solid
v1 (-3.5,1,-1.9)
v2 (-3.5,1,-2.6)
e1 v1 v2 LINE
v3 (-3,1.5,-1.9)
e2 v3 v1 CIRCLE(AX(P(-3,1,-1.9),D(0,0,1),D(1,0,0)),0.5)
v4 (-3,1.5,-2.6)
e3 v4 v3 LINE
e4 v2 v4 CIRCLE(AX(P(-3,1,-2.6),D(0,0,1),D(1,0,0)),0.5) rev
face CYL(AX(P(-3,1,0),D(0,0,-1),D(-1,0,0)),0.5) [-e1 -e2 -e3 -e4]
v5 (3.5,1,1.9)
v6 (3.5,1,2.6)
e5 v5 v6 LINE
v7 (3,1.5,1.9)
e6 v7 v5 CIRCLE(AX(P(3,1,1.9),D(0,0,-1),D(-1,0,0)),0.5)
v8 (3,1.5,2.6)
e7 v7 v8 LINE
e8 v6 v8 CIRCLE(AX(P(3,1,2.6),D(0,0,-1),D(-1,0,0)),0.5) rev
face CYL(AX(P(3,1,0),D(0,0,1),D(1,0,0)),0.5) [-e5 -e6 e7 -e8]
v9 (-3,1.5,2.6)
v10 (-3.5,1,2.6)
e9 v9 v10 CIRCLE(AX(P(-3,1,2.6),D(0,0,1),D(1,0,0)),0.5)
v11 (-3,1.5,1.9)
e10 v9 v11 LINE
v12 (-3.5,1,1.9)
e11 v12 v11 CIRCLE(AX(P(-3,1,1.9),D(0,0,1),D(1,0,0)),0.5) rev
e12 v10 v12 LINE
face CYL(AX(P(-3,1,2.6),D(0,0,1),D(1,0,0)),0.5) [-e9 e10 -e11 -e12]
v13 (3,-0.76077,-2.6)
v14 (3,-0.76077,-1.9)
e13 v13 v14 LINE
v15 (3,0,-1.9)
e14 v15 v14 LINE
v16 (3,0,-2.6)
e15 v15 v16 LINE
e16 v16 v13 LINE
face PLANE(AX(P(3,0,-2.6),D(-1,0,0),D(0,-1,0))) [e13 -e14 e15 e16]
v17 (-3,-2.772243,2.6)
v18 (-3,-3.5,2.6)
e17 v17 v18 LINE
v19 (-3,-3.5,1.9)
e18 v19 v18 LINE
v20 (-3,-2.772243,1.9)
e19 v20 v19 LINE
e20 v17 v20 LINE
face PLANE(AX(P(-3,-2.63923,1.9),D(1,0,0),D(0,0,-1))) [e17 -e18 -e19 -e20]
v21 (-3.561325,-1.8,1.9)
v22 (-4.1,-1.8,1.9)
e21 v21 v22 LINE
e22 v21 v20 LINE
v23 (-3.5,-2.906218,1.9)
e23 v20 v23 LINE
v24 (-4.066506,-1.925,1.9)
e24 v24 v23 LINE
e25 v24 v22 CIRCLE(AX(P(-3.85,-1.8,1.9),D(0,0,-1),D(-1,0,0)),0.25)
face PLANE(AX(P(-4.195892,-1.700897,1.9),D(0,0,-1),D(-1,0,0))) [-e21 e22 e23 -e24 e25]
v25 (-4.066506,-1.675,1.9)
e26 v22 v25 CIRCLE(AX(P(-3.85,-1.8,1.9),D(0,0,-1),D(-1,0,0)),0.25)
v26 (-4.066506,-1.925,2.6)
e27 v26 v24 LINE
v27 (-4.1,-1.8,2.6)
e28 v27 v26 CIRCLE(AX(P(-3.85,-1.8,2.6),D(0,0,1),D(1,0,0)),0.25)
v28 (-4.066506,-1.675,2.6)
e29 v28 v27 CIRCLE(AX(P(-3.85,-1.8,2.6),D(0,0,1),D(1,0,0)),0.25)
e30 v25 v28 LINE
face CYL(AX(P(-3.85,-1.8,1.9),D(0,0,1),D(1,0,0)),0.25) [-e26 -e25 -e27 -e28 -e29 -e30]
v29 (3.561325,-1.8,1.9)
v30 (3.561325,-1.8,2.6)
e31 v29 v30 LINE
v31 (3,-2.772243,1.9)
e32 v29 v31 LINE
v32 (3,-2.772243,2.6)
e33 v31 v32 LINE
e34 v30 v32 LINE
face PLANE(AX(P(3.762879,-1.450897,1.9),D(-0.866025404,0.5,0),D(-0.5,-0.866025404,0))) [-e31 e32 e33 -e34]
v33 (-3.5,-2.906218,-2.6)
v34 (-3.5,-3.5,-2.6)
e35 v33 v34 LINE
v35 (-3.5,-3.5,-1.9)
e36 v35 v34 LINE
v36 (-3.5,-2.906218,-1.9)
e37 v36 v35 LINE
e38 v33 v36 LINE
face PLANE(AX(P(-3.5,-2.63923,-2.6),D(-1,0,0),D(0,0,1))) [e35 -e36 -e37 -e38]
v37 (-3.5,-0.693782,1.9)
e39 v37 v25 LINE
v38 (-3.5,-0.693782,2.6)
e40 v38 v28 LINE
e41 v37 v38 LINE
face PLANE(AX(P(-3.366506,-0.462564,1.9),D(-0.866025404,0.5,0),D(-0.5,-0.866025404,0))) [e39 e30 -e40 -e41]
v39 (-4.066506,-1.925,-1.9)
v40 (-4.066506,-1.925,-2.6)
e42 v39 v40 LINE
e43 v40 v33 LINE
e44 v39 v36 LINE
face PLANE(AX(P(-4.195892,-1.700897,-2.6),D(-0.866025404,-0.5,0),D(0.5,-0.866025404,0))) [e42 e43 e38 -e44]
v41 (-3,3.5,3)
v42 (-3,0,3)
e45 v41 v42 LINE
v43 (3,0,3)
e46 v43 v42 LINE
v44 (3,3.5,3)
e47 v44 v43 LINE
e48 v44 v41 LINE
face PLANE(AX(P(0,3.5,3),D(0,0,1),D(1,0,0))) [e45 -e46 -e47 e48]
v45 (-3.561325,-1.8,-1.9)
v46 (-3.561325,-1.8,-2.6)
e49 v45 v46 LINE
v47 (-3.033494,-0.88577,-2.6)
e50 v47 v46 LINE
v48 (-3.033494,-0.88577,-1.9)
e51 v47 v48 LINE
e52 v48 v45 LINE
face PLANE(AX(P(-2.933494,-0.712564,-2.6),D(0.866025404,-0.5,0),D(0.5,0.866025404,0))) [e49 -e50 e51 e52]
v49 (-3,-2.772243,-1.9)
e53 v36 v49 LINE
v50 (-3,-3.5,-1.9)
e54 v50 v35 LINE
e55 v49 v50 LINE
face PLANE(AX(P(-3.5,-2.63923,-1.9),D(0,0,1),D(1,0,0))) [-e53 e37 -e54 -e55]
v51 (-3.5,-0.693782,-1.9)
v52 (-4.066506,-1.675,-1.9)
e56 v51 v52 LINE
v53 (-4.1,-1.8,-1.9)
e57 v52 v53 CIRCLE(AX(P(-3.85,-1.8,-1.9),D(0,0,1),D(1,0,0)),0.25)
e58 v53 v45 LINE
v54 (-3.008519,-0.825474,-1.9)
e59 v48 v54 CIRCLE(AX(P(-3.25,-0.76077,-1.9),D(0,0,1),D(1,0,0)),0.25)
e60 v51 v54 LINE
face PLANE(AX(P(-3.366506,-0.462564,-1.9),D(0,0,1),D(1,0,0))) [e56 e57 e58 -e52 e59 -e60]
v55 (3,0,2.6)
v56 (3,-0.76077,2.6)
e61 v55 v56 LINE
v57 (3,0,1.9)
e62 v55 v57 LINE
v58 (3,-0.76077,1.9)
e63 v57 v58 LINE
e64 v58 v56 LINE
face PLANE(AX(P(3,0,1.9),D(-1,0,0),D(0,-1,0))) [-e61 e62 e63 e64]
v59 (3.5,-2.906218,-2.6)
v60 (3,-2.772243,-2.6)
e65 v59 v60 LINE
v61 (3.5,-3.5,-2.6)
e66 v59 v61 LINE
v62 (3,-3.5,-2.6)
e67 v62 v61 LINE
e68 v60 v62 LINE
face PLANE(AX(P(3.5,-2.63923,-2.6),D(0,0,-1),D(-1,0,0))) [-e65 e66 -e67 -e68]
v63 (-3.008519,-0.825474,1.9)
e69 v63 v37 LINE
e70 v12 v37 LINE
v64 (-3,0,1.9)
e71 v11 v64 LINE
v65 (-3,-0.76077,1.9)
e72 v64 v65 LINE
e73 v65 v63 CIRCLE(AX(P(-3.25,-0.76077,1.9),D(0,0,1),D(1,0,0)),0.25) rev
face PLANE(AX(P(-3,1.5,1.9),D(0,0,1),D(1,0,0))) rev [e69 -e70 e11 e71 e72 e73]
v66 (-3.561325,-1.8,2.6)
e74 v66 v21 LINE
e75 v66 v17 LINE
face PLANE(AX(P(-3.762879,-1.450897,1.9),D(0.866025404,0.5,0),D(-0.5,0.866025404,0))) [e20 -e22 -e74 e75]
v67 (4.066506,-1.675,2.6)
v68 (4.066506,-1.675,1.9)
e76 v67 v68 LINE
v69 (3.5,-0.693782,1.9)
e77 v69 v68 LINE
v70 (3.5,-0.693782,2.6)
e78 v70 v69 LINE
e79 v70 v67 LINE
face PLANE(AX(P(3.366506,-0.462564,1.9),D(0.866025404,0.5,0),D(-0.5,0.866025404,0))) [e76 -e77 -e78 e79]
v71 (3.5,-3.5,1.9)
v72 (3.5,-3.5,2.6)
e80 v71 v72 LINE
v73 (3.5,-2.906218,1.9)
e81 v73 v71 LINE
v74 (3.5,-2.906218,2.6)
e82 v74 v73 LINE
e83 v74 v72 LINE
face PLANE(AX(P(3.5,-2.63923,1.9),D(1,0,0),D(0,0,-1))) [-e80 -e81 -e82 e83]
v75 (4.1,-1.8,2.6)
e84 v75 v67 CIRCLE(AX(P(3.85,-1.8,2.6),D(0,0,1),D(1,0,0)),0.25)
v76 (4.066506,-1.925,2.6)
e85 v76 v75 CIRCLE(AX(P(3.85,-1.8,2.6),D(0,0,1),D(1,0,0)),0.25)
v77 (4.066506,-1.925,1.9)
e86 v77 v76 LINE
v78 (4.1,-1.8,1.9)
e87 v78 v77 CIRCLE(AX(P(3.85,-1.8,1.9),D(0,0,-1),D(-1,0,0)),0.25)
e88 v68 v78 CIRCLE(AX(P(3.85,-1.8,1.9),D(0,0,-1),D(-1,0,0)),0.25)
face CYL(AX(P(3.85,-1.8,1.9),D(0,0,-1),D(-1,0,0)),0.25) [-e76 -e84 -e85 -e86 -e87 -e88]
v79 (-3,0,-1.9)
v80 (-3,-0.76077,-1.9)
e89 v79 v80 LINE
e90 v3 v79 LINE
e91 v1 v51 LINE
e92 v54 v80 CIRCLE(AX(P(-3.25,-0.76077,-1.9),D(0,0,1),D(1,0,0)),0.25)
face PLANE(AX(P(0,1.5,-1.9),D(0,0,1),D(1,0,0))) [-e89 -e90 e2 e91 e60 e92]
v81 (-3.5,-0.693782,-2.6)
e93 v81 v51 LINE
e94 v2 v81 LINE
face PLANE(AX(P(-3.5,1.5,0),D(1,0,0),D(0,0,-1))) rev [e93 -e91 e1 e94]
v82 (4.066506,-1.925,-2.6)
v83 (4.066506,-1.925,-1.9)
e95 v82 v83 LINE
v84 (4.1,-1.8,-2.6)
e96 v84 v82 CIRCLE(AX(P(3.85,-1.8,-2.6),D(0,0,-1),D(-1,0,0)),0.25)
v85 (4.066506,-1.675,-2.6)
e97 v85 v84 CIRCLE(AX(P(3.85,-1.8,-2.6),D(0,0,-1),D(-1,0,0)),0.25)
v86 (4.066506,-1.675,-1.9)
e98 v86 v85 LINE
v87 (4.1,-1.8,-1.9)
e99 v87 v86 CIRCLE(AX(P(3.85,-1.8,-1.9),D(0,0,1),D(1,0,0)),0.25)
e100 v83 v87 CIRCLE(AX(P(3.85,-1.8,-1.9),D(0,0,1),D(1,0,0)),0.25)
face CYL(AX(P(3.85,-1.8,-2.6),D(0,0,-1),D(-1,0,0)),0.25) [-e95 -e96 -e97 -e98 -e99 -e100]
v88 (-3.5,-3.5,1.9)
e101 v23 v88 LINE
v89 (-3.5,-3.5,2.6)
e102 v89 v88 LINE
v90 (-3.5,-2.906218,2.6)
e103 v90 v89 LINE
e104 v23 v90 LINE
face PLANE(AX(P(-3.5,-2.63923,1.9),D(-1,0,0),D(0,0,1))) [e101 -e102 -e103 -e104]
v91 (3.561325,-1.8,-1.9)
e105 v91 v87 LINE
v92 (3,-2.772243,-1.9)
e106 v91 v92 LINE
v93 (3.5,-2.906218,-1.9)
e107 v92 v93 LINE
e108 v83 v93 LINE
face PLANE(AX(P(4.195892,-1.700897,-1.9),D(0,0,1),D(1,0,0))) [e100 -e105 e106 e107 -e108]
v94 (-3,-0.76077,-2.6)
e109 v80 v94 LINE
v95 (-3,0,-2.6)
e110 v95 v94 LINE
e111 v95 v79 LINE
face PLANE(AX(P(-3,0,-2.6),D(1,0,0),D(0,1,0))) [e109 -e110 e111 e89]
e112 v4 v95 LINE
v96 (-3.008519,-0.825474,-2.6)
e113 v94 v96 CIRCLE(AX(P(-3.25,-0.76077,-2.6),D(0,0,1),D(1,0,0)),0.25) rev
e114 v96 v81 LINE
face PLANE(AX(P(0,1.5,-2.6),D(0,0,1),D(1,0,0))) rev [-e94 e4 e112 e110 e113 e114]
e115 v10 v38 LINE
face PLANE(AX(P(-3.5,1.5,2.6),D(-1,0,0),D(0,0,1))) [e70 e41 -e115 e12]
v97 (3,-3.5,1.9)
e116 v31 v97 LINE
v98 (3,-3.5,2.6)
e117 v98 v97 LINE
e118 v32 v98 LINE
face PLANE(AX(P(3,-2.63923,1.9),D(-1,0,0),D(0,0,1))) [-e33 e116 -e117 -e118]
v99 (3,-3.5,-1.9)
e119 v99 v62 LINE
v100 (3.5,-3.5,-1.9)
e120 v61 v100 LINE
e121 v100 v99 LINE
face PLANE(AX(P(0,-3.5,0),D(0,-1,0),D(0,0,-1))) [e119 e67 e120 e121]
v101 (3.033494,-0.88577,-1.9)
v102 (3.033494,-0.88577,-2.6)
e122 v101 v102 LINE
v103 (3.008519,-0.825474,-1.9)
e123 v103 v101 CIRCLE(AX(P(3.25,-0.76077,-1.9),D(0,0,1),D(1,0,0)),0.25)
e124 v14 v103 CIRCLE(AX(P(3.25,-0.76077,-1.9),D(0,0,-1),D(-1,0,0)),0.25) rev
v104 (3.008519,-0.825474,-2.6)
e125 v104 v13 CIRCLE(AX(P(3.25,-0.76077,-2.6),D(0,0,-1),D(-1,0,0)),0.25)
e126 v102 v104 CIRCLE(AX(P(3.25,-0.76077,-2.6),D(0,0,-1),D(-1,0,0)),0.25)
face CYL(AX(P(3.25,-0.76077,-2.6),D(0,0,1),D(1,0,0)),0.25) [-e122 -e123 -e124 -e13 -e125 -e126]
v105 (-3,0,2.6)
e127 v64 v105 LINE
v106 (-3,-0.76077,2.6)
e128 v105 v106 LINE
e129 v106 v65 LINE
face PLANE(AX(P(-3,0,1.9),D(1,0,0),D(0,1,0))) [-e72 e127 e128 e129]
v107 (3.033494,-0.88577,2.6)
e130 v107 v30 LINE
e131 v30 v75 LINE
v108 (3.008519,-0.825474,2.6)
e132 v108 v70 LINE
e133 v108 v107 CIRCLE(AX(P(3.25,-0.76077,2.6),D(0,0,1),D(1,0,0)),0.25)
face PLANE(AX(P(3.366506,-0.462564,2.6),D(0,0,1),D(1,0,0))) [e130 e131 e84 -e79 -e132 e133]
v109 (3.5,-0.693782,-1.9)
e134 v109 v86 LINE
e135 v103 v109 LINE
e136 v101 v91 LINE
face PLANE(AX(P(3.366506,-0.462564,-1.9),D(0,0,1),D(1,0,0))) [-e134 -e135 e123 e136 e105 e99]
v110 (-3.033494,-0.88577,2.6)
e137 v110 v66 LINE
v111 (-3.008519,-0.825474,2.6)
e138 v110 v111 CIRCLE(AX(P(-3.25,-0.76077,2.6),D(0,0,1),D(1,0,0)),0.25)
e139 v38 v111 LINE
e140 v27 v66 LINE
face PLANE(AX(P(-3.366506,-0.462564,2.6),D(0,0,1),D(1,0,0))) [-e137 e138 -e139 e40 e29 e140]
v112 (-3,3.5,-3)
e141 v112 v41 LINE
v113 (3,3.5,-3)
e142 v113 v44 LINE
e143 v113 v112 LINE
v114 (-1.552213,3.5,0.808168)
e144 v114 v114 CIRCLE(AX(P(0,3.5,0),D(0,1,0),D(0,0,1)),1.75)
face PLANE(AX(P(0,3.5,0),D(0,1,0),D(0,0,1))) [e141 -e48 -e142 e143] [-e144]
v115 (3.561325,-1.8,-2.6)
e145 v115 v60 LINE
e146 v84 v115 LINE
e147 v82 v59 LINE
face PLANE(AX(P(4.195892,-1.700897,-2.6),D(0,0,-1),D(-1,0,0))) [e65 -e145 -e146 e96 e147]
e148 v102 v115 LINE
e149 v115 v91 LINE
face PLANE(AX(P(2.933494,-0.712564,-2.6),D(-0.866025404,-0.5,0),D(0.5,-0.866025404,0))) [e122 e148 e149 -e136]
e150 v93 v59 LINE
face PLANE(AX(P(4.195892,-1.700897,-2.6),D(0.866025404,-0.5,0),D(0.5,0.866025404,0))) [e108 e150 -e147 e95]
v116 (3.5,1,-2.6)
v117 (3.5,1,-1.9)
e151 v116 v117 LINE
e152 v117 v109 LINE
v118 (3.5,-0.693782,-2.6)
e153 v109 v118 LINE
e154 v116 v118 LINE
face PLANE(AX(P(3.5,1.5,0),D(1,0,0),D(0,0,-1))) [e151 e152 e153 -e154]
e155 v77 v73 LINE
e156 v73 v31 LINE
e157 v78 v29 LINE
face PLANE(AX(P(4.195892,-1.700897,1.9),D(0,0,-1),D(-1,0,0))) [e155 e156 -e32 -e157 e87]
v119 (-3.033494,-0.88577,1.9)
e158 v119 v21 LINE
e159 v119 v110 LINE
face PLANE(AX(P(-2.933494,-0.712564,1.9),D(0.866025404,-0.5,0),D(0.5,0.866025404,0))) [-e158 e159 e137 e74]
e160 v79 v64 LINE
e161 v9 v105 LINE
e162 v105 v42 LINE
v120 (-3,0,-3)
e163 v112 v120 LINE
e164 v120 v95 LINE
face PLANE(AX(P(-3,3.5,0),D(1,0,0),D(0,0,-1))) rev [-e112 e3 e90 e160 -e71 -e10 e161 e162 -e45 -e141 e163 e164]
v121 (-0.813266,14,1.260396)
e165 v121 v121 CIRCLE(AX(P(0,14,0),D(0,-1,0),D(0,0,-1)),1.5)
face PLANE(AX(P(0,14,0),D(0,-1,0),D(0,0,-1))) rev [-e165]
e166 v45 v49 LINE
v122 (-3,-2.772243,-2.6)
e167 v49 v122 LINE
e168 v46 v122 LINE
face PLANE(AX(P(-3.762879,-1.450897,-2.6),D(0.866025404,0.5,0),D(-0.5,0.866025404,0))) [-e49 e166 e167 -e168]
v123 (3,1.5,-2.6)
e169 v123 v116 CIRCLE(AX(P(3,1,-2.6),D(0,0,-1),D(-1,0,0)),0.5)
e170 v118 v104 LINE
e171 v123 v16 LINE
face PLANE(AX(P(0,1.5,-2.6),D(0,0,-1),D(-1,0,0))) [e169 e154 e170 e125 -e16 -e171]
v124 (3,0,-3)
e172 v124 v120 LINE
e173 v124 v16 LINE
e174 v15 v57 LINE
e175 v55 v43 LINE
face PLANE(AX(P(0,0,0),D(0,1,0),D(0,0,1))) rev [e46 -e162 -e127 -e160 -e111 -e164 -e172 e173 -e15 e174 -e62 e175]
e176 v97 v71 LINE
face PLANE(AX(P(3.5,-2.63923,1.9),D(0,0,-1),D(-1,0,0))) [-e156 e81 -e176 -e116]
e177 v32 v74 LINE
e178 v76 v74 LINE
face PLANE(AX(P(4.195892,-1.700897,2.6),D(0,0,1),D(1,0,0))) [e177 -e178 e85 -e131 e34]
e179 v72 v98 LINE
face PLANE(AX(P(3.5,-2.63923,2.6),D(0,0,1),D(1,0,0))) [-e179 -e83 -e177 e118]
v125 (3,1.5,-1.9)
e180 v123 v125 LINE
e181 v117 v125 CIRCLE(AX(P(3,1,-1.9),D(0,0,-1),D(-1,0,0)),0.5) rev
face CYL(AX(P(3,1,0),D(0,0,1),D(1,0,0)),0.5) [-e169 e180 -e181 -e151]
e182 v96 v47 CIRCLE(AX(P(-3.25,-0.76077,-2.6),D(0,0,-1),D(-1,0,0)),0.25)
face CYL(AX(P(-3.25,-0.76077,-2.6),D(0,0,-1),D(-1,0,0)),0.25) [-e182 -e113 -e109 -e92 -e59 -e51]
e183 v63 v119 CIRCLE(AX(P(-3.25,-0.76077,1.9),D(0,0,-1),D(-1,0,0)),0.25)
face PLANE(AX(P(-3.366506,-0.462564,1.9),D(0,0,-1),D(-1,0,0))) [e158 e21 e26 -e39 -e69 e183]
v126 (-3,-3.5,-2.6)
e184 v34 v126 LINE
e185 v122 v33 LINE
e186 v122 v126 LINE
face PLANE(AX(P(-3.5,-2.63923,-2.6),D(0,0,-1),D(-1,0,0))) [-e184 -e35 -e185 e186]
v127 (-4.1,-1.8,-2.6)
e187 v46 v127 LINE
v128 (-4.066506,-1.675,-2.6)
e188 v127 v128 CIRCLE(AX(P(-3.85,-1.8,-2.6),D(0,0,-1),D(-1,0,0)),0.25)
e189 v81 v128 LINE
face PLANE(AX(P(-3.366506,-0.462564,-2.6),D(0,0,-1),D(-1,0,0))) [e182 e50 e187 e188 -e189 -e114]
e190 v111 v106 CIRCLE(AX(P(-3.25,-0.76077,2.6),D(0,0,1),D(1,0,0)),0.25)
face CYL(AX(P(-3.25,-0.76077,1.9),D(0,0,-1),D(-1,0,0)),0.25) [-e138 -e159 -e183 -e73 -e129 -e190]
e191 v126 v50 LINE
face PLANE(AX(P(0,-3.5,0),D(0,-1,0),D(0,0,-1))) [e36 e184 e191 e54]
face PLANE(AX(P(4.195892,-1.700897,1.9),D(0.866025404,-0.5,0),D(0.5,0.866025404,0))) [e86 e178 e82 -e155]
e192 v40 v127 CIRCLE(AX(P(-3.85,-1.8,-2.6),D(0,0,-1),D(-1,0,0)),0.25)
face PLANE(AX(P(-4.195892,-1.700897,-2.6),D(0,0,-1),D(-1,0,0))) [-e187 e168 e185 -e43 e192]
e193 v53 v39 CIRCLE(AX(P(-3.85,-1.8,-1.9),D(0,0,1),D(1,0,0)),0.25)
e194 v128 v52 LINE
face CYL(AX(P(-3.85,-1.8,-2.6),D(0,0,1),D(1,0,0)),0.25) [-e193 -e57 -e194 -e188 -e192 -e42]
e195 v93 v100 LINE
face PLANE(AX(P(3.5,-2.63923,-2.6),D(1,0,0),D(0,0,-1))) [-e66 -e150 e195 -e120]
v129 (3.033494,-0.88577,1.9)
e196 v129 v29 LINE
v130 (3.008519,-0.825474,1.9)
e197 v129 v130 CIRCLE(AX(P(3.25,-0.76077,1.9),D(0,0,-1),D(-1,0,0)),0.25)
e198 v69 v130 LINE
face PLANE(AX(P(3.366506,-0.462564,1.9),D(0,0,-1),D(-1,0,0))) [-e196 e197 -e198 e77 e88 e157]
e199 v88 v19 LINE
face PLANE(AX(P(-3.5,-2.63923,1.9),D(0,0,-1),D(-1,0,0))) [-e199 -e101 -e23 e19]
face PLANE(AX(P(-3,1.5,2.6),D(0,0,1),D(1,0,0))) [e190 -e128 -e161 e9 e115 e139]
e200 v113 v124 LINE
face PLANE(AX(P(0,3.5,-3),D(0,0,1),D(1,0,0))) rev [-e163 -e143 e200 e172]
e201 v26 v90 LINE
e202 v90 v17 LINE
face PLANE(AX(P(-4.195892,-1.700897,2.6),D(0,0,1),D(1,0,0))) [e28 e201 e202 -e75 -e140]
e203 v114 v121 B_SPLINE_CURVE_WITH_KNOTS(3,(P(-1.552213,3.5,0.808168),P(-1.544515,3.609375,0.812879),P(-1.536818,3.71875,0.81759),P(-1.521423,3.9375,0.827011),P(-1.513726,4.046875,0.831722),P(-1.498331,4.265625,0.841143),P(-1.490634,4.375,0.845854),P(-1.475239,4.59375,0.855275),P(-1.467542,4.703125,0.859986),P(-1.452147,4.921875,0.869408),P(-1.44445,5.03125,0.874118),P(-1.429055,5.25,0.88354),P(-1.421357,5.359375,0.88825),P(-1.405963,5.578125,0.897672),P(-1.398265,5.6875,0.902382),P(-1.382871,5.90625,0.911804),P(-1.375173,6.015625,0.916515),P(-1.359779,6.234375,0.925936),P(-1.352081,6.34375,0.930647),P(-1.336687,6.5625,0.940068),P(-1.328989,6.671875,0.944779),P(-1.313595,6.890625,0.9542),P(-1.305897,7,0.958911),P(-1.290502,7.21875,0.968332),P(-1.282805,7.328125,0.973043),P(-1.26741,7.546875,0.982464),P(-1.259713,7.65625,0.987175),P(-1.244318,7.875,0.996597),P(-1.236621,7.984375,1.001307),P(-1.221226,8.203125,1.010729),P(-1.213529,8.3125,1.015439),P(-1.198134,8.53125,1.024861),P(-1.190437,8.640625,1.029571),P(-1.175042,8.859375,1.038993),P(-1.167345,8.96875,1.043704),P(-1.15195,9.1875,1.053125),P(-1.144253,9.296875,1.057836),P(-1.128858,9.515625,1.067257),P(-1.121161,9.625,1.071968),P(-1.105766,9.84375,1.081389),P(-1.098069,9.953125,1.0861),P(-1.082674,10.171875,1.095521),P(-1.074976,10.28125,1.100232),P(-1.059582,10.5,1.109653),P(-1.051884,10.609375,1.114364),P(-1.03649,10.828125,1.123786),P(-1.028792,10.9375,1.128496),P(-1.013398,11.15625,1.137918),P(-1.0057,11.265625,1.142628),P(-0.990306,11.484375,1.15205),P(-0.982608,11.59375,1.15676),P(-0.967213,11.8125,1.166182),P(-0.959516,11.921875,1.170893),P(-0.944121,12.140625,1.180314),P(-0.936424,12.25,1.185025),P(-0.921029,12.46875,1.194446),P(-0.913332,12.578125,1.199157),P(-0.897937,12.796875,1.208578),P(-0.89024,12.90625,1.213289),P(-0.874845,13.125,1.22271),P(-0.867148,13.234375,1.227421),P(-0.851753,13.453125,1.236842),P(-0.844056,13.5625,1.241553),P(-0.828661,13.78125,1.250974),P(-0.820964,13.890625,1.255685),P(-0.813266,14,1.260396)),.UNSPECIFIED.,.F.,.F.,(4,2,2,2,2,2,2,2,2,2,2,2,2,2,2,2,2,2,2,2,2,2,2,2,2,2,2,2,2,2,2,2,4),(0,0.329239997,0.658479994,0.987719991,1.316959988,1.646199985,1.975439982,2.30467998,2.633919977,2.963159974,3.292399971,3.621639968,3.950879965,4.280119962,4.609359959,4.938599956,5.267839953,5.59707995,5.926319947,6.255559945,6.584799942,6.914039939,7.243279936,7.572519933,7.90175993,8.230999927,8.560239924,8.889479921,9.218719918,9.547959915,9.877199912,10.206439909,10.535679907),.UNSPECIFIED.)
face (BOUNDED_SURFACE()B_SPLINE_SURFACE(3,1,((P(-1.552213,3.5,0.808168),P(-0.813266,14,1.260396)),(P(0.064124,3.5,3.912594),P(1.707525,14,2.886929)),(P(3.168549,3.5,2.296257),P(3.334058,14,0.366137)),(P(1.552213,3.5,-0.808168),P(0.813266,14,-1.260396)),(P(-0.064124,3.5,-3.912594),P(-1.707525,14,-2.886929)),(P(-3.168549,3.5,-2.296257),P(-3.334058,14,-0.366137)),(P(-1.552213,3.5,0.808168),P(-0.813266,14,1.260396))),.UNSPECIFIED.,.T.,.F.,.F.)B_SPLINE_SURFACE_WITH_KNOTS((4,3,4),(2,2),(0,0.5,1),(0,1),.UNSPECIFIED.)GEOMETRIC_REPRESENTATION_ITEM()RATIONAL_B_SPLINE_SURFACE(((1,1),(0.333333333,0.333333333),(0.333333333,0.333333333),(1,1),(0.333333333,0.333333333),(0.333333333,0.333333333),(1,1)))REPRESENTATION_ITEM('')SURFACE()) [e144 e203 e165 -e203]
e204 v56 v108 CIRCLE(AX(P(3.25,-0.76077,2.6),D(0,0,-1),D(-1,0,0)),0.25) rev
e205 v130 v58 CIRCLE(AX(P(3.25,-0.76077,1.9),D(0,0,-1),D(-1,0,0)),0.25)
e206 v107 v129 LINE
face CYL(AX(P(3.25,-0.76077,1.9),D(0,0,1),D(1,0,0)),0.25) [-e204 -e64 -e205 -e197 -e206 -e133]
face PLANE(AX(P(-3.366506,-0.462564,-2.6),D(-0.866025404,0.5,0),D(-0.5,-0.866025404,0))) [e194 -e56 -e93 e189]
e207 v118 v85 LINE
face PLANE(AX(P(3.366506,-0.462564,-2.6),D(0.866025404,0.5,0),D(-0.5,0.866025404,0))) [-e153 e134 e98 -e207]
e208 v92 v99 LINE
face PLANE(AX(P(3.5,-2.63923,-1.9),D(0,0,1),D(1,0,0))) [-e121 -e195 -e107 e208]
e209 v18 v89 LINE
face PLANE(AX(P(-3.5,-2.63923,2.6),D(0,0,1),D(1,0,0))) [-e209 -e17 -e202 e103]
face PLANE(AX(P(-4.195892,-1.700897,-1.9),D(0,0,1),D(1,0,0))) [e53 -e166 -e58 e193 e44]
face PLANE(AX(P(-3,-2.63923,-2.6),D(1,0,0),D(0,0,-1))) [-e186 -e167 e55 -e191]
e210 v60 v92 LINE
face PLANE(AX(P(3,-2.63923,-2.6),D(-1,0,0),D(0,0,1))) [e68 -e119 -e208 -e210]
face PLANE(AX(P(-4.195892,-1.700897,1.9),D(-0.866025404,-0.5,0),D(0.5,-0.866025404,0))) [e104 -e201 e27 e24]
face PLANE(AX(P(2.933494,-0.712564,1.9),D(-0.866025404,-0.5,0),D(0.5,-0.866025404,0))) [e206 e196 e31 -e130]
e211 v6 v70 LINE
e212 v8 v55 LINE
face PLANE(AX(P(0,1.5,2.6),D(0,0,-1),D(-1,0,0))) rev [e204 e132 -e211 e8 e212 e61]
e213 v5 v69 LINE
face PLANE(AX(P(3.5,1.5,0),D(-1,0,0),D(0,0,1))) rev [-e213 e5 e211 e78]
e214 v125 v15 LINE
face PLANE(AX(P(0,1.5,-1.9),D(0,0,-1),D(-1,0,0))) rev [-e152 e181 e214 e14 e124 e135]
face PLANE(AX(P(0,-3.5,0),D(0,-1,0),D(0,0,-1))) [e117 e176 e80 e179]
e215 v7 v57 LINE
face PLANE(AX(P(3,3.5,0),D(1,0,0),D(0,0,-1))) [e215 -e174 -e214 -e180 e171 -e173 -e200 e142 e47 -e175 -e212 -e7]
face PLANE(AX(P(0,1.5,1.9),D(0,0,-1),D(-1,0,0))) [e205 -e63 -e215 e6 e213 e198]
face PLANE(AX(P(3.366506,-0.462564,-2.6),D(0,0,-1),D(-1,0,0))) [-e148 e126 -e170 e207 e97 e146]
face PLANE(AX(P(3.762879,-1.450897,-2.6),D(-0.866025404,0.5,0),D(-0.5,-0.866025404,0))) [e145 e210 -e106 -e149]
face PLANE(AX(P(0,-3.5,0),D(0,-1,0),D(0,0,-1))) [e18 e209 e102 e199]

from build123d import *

# Parameters (mm, degrees)
SKETCH1_W           = 6
SKETCH1_H           = 6
BOSS_EXTRUDE1_DEPTH = 3.5
SKETCH1_3_W         = 0.5
SKETCH1_3_H         = 0.7
BOSS_EXTRUDE2_DEPTH = 1.5
FILLET1_R           = 0.5
SKETCH10_W          = 0.5
SKETCH10_H          = 0.7
FILLET2_R           = 0.25


with BuildPart() as part:
    # Sketch1 → Boss-Extrude1 (new body)
    with BuildSketch(Plane(origin=(0, 0, 0), x_dir=(1, 0, 0), z_dir=(0, 1, 0))):
        Rectangle(SKETCH1_W, SKETCH1_H)
    extrude(amount=BOSS_EXTRUDE1_DEPTH)

    # Loft1: read off the stored shape, not the designer's step
    # Loft1: loft between two sections, ruled curve by curve
    loft1_from = [
        Edge.make_bspline([(-1.552212541, 3.5, 0.80816844), (0.064124339, 3.5, 3.912593522), (3.168549421, 3.5, 2.296256642), (1.552212541, 3.5, -0.80816844), (-0.064124339, 3.5, -3.912593522), (-3.168549421, 3.5, -2.296256642), (-1.552212541, 3.5, 0.80816844)], [0, 0, 0, 0, 0.5, 0.5, 0.5, 1, 1, 1, 1], 3, [1, 0.333333333, 0.333333333, 1, 0.333333333, 0.333333333, 1]),
    ]
    loft1_to = [
        Edge.make_bspline([(-0.81326638, 14, 1.260395888), (1.707525396, 14, 2.886928648), (3.334058157, 14, 0.366136872), (0.81326638, 14, -1.260395888), (-1.707525396, 14, -2.886928648), (-3.334058157, 14, -0.366136872), (-0.81326638, 14, 1.260395888)], [0, 0, 0, 0, 0.5, 0.5, 0.5, 1, 1, 1, 1], 3, [1, 0.333333333, 0.333333333, 1, 0.333333333, 0.333333333, 1]),
    ]
    loft1 = Solid(Shell([*[Face.make_surface_from_curves(loft1_from[k], loft1_to[k]) for k in range(1)], Face(Wire(loft1_from)), Face(Wire(loft1_to))]))
    add(loft1)

    # Sketch1<3> → Boss-Extrude2 (add)
    with BuildSketch(Plane(origin=(0, 0, 0), x_dir=(1, 0, 0), z_dir=(0, 1, 0))):
        with Locations((3.25, -2.25)):
            Rectangle(SKETCH1_3_W, SKETCH1_3_H)
        with Locations((3.25, 2.25)):
            Rectangle(SKETCH1_3_W, SKETCH1_3_H)
        with Locations((-3.25, 2.25)):
            Rectangle(SKETCH1_3_W, SKETCH1_3_H)
        with Locations((-3.25, -2.25)):
            Rectangle(SKETCH1_3_W, SKETCH1_3_H)
    extrude(amount=BOSS_EXTRUDE2_DEPTH)

    # Fillet1
    fillet1_edges = [part.edges().sort_by_distance(p)[0] for p in [
        (3.5, 1.5, 2.25),
        (3.5, 1.5, -2.25),
        (-3.5, 1.5, 2.25),
        (-3.5, 1.5, -2.25),
    ]]
    fillet(fillet1_edges, radius=FILLET1_R - 0.0001)  # a hair under: the kernel refuses the full size

    # Sweep5: sweep along a path in Sketch8
    with BuildLine(Plane.XY.offset(2.3)) as sweep5_path:
        Line((3.25, 0), (3.25, -0.760769515))
        Line((3.25, -0.760769515), (3.85, -1.8))
        Line((3.85, -1.8), (3.25, -2.839230485))
        Line((3.25, -2.839230485), (3.25, -3.5))
    # Sketch10 → Sweep5 (sweep)
    with BuildSketch(Plane(origin=(0, -3.5, 0), x_dir=(-1, 0, 0), z_dir=(0, -1, 0))):
        with Locations((-3.25, 2.25)):
            Rectangle(SKETCH10_W, SKETCH10_H)
        with Locations((-3.25, -2.25)):
            Rectangle(SKETCH10_W, SKETCH10_H)
    sweep5 = sweep(path=sweep5_path.line, transition=Transition.RIGHT)

    # Mirror1: Sweep5 across plane
    add(sweep5.mirror(Plane(origin=(0, 0, 0), x_dir=(0, 0, 1), z_dir=(1, 0, 0))))

    # Fillet2
    fillet2_edges = [part.edges().sort_by_distance(p)[0] for p in [
        (4.138675135, -1.8, -2.25),
        (3, -0.827756814, -2.25),
        (4.138675135, -1.8, 2.25),
        (3, -0.827756814, 2.25),
        (-4.138675135, -1.8, -2.25),
        (-3, -0.827756814, -2.25),
        (-4.138675135, -1.8, 2.25),
        (-3, -0.827756814, 2.25),
    ]]
    fillet(fillet2_edges, radius=FILLET2_R)


solid = part.part
